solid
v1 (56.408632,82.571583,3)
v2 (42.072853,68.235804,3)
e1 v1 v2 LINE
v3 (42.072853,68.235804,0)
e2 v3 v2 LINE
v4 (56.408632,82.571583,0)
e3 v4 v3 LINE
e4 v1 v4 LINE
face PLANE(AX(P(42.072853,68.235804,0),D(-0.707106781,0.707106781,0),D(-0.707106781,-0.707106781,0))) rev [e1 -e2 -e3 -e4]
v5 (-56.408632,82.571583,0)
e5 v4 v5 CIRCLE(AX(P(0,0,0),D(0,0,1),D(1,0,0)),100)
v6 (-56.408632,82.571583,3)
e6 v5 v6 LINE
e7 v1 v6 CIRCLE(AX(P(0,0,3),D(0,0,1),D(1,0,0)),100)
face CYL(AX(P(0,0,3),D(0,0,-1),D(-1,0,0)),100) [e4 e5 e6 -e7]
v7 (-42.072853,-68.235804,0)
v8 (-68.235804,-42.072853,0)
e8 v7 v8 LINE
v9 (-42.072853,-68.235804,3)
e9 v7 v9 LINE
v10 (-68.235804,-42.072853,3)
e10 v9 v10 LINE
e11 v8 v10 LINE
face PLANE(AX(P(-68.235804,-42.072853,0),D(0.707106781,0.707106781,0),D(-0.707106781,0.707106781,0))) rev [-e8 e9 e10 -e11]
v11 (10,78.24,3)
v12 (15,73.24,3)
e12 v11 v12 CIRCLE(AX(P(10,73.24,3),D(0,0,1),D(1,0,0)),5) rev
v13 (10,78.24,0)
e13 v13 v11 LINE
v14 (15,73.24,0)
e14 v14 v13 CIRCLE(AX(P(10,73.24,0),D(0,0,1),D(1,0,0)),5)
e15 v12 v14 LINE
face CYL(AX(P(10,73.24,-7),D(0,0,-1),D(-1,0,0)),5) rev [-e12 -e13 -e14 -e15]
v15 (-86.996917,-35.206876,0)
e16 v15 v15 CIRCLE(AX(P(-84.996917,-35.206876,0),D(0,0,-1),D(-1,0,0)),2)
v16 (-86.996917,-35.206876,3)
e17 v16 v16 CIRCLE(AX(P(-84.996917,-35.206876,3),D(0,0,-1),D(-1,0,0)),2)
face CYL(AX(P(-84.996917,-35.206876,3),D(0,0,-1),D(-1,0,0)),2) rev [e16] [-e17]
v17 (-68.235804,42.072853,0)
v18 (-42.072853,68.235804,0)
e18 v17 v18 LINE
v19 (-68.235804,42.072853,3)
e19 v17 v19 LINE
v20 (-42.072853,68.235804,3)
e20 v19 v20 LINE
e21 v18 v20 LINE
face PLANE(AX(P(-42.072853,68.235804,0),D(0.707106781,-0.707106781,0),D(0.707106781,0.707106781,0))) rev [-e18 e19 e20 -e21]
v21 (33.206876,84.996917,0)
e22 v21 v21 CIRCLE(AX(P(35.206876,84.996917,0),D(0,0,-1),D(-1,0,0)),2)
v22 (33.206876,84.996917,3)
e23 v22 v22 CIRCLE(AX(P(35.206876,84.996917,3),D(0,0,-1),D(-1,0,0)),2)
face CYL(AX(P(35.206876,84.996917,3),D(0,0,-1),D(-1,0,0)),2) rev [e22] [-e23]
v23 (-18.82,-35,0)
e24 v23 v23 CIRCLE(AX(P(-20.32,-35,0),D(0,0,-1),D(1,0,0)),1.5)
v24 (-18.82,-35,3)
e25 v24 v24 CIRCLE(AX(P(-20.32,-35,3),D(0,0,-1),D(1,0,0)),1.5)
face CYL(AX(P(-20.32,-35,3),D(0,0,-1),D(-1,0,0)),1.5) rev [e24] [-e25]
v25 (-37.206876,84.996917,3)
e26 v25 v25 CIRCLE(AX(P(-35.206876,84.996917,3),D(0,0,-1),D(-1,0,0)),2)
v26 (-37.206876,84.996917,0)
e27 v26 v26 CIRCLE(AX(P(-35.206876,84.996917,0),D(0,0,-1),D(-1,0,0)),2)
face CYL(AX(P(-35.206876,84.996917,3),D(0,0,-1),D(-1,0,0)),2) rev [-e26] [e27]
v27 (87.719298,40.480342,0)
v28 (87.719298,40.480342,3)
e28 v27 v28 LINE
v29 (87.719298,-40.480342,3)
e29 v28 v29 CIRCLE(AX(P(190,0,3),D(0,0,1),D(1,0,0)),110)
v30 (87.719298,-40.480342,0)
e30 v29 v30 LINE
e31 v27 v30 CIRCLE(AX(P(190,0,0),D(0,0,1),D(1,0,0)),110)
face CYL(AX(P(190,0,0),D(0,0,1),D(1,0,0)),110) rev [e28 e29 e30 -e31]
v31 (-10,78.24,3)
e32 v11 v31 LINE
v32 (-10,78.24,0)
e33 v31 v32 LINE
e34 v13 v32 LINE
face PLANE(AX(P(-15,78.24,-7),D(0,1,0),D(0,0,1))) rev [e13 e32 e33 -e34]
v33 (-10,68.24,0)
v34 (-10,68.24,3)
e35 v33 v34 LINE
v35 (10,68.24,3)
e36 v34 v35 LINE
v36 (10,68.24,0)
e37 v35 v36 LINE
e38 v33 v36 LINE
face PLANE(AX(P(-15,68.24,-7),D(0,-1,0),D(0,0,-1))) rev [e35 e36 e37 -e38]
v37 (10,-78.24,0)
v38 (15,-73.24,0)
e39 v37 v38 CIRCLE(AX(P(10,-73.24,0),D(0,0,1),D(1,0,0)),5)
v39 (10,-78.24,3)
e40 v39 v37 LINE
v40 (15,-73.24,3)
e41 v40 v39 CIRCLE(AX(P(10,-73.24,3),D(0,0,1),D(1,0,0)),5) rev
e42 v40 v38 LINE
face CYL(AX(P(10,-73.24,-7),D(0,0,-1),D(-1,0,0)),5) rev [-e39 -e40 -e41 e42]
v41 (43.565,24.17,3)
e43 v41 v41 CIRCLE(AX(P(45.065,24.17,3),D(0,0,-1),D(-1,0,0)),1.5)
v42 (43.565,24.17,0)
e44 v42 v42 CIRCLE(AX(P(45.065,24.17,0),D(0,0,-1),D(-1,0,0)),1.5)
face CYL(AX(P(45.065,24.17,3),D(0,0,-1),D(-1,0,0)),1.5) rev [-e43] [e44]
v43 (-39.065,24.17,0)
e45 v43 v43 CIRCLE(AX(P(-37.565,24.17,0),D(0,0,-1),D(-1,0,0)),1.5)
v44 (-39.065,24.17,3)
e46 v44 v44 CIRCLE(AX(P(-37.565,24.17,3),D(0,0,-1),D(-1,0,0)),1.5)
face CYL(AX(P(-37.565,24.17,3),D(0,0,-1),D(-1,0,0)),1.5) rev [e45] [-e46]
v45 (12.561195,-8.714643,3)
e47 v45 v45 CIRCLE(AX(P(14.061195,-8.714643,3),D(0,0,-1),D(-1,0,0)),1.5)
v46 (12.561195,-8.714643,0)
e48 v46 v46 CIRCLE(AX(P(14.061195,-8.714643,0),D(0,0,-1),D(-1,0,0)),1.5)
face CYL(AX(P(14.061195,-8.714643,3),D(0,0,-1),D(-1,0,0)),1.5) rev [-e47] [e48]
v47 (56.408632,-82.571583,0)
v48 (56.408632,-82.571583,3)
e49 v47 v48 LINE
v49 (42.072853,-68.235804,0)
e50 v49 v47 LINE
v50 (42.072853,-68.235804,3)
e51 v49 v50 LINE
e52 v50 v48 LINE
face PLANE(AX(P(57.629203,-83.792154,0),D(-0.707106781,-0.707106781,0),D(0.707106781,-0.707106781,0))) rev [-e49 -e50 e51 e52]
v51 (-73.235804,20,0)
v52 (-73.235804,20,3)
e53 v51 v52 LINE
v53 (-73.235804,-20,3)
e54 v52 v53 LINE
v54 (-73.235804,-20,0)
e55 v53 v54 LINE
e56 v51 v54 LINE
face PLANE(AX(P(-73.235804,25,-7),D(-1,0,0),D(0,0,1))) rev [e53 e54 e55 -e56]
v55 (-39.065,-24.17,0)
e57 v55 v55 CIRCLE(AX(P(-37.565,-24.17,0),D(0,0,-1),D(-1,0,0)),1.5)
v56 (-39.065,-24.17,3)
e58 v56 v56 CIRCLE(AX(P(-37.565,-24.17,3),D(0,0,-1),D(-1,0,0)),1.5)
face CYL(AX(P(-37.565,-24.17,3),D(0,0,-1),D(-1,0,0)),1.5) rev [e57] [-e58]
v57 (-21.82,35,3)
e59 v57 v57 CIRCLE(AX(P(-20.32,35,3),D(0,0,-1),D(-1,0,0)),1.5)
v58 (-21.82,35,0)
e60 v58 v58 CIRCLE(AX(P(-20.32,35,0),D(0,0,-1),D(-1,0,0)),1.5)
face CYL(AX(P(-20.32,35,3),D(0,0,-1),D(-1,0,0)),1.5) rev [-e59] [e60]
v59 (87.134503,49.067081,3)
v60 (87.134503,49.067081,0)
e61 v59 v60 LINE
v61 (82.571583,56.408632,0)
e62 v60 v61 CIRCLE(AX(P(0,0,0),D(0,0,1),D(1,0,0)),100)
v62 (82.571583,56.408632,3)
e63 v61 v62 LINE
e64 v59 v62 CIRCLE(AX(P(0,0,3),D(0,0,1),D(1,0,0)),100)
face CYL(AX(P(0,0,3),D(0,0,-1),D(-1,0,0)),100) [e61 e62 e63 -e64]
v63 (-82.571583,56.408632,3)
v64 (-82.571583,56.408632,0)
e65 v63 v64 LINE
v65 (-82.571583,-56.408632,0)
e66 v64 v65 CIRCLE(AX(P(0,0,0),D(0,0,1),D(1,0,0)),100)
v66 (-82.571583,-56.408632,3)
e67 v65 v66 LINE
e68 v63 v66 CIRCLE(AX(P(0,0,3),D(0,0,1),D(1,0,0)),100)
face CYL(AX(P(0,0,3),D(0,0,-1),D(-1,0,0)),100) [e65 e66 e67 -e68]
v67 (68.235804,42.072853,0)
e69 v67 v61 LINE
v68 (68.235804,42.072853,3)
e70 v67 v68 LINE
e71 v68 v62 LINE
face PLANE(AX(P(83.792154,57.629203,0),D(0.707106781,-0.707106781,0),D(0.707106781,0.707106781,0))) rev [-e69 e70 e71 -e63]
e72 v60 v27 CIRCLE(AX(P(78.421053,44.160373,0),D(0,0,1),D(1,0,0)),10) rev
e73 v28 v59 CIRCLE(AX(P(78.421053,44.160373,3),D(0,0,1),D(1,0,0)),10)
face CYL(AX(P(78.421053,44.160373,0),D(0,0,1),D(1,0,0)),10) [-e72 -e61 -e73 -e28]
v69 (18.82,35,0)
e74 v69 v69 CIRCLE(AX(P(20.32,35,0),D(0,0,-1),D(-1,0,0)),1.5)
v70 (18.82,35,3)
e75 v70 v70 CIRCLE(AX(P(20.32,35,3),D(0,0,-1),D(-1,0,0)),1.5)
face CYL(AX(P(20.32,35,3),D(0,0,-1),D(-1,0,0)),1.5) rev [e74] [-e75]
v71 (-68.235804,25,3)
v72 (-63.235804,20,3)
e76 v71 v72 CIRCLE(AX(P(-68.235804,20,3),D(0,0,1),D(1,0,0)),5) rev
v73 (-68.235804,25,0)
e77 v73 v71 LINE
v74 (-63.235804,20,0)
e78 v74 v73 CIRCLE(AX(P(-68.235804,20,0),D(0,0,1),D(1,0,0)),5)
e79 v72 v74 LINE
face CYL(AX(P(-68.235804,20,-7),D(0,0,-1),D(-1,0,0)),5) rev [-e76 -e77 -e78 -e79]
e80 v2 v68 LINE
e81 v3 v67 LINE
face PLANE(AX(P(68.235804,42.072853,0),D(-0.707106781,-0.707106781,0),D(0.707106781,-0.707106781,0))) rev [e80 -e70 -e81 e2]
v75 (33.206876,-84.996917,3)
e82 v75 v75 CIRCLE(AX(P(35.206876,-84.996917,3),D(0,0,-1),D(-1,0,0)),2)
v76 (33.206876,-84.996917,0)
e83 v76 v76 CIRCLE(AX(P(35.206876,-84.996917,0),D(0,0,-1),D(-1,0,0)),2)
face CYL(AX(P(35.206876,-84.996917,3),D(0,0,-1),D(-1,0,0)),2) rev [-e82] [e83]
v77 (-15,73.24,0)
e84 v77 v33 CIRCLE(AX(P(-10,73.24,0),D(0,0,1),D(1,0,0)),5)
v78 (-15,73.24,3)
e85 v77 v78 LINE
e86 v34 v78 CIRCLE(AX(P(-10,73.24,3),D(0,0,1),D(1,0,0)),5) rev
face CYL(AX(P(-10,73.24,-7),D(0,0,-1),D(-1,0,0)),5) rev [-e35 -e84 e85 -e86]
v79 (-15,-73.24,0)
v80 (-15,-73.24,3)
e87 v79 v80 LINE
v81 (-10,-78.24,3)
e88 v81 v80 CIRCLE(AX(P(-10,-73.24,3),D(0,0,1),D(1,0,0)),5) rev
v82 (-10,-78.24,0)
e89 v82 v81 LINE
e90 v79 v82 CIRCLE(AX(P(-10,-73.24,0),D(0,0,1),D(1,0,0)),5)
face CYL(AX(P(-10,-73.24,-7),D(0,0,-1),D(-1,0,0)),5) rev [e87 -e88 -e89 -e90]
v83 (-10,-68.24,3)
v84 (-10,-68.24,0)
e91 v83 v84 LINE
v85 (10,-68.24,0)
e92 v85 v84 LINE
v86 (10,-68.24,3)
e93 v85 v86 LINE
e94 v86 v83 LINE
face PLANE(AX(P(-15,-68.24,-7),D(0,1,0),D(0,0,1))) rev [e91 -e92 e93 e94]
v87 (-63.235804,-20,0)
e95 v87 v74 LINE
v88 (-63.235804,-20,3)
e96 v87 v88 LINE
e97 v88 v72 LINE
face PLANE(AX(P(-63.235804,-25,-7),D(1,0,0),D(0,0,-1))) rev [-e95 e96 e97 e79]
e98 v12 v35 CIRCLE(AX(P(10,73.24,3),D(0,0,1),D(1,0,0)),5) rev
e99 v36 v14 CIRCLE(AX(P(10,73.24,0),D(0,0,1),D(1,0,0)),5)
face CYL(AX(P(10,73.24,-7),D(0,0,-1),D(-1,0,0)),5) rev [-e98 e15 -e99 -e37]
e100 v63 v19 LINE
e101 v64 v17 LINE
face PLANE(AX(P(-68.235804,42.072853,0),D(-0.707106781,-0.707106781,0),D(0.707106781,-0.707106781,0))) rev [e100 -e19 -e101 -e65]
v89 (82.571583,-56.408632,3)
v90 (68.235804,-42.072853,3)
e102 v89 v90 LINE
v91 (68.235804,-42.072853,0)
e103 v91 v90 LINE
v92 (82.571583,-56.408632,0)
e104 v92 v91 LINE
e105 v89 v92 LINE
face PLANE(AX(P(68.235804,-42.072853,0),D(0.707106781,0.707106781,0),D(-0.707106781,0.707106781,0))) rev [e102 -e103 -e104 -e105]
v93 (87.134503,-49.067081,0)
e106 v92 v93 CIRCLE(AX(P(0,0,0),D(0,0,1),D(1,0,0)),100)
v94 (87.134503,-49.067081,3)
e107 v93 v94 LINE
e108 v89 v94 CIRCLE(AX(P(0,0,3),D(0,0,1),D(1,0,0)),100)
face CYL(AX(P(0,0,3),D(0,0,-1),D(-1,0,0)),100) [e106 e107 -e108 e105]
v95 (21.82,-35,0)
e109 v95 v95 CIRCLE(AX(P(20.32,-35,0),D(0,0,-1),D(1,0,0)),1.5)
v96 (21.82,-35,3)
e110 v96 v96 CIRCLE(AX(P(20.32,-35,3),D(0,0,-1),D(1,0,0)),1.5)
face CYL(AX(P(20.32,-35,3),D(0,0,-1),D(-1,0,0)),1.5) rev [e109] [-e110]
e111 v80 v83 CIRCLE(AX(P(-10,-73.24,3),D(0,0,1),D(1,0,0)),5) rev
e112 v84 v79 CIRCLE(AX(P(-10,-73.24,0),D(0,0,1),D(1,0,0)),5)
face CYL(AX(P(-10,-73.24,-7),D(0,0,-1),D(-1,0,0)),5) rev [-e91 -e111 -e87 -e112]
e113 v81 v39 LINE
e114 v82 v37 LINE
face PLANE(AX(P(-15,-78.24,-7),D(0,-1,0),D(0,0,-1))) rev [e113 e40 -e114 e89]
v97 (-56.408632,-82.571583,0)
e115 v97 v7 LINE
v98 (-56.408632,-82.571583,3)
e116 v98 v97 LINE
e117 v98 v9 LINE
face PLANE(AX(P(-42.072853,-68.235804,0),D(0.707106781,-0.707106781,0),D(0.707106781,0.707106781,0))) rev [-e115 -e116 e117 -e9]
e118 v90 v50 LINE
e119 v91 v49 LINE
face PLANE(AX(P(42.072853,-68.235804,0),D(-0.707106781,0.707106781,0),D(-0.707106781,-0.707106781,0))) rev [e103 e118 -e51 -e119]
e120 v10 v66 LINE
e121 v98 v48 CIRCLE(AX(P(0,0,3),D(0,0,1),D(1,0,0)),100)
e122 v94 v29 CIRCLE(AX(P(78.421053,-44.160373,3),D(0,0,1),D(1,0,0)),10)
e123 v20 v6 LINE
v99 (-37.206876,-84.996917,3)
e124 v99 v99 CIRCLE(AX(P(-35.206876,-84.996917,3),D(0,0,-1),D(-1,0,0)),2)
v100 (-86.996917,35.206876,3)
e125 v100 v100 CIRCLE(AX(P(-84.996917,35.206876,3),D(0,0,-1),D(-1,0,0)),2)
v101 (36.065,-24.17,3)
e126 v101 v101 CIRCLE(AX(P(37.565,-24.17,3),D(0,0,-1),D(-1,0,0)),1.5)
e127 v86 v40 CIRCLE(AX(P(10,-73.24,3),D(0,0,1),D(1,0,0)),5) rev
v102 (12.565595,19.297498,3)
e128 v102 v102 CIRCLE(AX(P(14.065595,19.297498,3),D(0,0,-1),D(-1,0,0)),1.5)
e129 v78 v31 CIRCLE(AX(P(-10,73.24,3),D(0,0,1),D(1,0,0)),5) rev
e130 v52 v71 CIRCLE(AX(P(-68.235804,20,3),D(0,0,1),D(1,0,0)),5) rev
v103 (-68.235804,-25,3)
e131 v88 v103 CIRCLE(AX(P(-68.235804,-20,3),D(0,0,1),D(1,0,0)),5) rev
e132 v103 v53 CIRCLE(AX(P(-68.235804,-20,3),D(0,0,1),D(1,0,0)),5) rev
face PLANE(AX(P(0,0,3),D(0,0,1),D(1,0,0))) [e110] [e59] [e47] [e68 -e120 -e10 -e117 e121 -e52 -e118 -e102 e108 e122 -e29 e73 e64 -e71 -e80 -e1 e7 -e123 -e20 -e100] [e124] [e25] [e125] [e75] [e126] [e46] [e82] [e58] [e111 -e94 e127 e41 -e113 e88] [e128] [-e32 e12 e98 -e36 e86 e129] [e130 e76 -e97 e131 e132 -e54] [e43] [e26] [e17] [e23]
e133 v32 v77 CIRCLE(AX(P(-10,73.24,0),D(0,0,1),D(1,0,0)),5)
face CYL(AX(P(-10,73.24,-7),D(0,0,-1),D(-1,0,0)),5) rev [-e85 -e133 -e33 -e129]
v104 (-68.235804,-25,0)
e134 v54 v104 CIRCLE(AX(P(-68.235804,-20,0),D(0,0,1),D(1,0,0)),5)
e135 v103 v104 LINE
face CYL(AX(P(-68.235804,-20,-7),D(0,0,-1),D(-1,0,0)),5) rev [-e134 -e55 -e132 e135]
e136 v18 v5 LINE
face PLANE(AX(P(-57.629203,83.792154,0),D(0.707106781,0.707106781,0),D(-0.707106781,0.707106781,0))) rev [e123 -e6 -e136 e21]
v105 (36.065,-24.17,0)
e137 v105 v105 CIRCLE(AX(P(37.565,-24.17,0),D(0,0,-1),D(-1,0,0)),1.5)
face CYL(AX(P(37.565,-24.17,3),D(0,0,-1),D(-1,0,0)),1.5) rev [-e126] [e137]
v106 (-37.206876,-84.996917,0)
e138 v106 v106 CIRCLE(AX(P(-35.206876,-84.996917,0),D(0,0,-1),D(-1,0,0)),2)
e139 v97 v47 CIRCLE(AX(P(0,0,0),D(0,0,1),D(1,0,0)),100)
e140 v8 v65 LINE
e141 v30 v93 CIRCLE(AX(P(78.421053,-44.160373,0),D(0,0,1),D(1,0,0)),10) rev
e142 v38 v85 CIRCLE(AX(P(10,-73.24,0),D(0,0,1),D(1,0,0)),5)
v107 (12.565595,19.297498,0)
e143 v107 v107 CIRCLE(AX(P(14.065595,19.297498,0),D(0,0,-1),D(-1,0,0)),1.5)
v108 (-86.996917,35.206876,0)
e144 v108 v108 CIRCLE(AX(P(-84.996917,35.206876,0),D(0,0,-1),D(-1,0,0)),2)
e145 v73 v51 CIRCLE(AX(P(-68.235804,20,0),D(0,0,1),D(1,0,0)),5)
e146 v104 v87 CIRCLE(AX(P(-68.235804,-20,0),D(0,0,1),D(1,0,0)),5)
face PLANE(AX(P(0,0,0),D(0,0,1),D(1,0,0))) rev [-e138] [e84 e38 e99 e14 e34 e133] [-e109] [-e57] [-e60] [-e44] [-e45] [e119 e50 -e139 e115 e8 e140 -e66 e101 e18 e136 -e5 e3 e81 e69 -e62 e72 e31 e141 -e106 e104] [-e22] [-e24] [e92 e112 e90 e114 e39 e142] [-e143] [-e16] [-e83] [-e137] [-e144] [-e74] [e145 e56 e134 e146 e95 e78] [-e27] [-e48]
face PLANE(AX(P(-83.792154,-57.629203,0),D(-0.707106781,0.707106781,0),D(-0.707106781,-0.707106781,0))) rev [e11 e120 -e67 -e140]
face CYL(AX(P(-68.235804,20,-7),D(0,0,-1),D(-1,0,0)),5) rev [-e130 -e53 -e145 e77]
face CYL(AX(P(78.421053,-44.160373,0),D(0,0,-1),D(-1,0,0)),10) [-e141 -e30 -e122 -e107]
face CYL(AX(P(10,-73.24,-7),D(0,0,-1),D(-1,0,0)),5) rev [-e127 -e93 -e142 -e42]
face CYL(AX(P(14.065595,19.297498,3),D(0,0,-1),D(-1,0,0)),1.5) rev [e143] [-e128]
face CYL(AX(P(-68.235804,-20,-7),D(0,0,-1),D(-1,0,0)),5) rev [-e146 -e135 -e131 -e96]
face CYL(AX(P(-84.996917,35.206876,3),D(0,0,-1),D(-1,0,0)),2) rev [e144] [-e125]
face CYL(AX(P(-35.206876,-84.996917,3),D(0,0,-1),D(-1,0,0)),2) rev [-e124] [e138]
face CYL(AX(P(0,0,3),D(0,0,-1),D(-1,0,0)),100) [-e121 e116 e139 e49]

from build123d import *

# Parameters (mm, degrees)
CROQUIS1_R              = 100
SALIENTE_EXTRUIR1_DEPTH = 3
CROQUIS3_R              = 110
CORTAR_EXTRUIR1_DEPTH   = 3
REDONDEO1_R             = 10
CORTAR_EXTRUIR2_DEPTH   = 142.453172607
CROQUIS6_W              = 10
CROQUIS6_H              = 50
CROQUIS6_W_2            = 30
CROQUIS6_H_2            = 10
CORTAR_EXTRUIR4_DEPTH   = 10
REDONDEO3_R             = 5
CROQUIS7_R              = 1.5
CORTAR_EXTRUIR5_DEPTH   = 142.453172607
CROQUIS8_R              = 1.5
CORTAR_EXTRUIR6_DEPTH   = 142.453172607
CROQUIS9_R              = 2
CORTAR_EXTRUIR7_DEPTH   = 142.453172607


with BuildPart() as part:
    # Croquis1 → Saliente-Extruir1 (new body)
    with BuildSketch(Plane.XY):
        Circle(CROQUIS1_R)
    extrude(amount=SALIENTE_EXTRUIR1_DEPTH)

    # Croquis3 → Cortar-Extruir1 (cut)
    with BuildSketch(Plane.XY.offset(3)):
        with Locations((190, 0)):
            Circle(CROQUIS3_R)
    extrude(amount=-CORTAR_EXTRUIR1_DEPTH, mode=Mode.SUBTRACT)

    # Redondeo1
    redondeo1_edges = [part.edges().sort_by_distance(p)[0] for p in [
        (89.473684211, -44.659375654, 1.5),
        (89.473684211, 44.659375654, 1.5),
    ]]
    fillet(redondeo1_edges, radius=REDONDEO1_R)

    # Croquis4 → Cortar-Extruir2 (cut, through all)
    with BuildSketch(Plane.XY.offset(3)):
        Polygon((-57.629202667, -83.792153571), (-83.792153571, -57.629202667), (-68.235804385, -42.072853481), (-42.072853481, -68.235804385), align=None)
        Polygon((-57.629202667, 83.792153571), (-42.072853481, 68.235804385), (-68.235804385, 42.072853481), (-83.792153571, 57.629202667), align=None)
        Polygon((83.792153571, 57.629202667), (68.235804385, 42.072853481), (42.072853481, 68.235804385), (57.629202667, 83.792153571), align=None)
        Polygon((57.629202667, -83.792153571), (42.072853481, -68.235804385), (68.235804385, -42.072853481), (83.792153571, -57.629202667), align=None)
    extrude(amount=-CORTAR_EXTRUIR2_DEPTH, mode=Mode.SUBTRACT)

    # Croquis6 → Cortar-Extruir4 (cut)
    with BuildSketch(Plane.XY.offset(3)):
        with Locations((-68.235804385, 0)):
            Rectangle(CROQUIS6_W, CROQUIS6_H)
        with Locations((0, 73.24)):
            Rectangle(CROQUIS6_W_2, CROQUIS6_H_2)
        with Locations((0, -73.24)):
            Rectangle(CROQUIS6_W_2, CROQUIS6_H_2)
    extrude(amount=-CORTAR_EXTRUIR4_DEPTH, mode=Mode.SUBTRACT)

    # Redondeo3
    redondeo3_edges = [part.edges().sort_by_distance(p)[0] for p in [
        (15, -78.24, 1.5),
        (-15, -78.24, 1.5),
        (15, -68.24, 1.5),
        (-15, -68.24, 1.5),
        (-73.235804385, -25, 1.5),
        (-63.235804385, -25, 1.5),
        (-73.235804385, 25, 1.5),
        (-63.235804385, 25, 1.5),
        (-15, 68.24, 1.5),
        (15, 68.24, 1.5),
        (-15, 78.24, 1.5),
        (15, 78.24, 1.5),
    ]]
    fillet(redondeo3_edges, radius=REDONDEO3_R - 0.0001)  # a hair under: the kernel refuses the full size

    # Croquis7 → Cortar-Extruir5 (cut, through all)
    with BuildSketch(Plane(origin=(0, 0, 0), x_dir=(-1, 0, 0), z_dir=(0, 0, -1))):
        with Locations((37.565, -24.17)):
            Circle(CROQUIS7_R)
        with Locations((-37.565, -24.17)):
            Circle(CROQUIS7_R)
        with Locations((-45.065, 24.17)):
            Circle(CROQUIS7_R)
        with Locations((37.565, 24.17)):
            Circle(CROQUIS7_R)
        with Locations((-14.06559482, 19.297497716)):
            Circle(CROQUIS7_R)
        with Locations((-14.061195262, -8.714642909)):
            Circle(CROQUIS7_R)
    extrude(amount=-CORTAR_EXTRUIR5_DEPTH, mode=Mode.SUBTRACT)

    # Croquis8 → Cortar-Extruir6 (cut, through all)
    with BuildSketch(Plane(origin=(0, 0, 0), x_dir=(-1, 0, 0), z_dir=(0, 0, -1))):
        with Locations((-20.32, 35)):
            Circle(CROQUIS8_R)
        with Locations((20.32, 35)):
            Circle(CROQUIS8_R)
        with Locations(Location((20.32, -35, 0), (0, 0, 180))):
            Circle(CROQUIS8_R)
        with Locations(Location((-20.32, -35, 0), (0, 0, 180))):
            Circle(CROQUIS8_R)
    extrude(amount=-CORTAR_EXTRUIR6_DEPTH, mode=Mode.SUBTRACT)

    # Croquis9 → Cortar-Extruir7 (cut, through all)
    with BuildSketch(Plane(origin=(0, 0, 0), x_dir=(-1, 0, 0), z_dir=(0, 0, -1))):
        with Locations((-35.206875778, 84.996916991)):
            Circle(CROQUIS9_R)
        with Locations((35.206875778, 84.996916991)):
            Circle(CROQUIS9_R)
        with Locations((84.996916991, 35.206875778)):
            Circle(CROQUIS9_R)
        with Locations((84.996916991, -35.206875778)):
            Circle(CROQUIS9_R)
        with Locations((35.206875778, -84.996916991)):
            Circle(CROQUIS9_R)
        with Locations((-35.206875778, -84.996916991)):
            Circle(CROQUIS9_R)
    extrude(amount=-CORTAR_EXTRUIR7_DEPTH, mode=Mode.SUBTRACT)


solid = part.part
